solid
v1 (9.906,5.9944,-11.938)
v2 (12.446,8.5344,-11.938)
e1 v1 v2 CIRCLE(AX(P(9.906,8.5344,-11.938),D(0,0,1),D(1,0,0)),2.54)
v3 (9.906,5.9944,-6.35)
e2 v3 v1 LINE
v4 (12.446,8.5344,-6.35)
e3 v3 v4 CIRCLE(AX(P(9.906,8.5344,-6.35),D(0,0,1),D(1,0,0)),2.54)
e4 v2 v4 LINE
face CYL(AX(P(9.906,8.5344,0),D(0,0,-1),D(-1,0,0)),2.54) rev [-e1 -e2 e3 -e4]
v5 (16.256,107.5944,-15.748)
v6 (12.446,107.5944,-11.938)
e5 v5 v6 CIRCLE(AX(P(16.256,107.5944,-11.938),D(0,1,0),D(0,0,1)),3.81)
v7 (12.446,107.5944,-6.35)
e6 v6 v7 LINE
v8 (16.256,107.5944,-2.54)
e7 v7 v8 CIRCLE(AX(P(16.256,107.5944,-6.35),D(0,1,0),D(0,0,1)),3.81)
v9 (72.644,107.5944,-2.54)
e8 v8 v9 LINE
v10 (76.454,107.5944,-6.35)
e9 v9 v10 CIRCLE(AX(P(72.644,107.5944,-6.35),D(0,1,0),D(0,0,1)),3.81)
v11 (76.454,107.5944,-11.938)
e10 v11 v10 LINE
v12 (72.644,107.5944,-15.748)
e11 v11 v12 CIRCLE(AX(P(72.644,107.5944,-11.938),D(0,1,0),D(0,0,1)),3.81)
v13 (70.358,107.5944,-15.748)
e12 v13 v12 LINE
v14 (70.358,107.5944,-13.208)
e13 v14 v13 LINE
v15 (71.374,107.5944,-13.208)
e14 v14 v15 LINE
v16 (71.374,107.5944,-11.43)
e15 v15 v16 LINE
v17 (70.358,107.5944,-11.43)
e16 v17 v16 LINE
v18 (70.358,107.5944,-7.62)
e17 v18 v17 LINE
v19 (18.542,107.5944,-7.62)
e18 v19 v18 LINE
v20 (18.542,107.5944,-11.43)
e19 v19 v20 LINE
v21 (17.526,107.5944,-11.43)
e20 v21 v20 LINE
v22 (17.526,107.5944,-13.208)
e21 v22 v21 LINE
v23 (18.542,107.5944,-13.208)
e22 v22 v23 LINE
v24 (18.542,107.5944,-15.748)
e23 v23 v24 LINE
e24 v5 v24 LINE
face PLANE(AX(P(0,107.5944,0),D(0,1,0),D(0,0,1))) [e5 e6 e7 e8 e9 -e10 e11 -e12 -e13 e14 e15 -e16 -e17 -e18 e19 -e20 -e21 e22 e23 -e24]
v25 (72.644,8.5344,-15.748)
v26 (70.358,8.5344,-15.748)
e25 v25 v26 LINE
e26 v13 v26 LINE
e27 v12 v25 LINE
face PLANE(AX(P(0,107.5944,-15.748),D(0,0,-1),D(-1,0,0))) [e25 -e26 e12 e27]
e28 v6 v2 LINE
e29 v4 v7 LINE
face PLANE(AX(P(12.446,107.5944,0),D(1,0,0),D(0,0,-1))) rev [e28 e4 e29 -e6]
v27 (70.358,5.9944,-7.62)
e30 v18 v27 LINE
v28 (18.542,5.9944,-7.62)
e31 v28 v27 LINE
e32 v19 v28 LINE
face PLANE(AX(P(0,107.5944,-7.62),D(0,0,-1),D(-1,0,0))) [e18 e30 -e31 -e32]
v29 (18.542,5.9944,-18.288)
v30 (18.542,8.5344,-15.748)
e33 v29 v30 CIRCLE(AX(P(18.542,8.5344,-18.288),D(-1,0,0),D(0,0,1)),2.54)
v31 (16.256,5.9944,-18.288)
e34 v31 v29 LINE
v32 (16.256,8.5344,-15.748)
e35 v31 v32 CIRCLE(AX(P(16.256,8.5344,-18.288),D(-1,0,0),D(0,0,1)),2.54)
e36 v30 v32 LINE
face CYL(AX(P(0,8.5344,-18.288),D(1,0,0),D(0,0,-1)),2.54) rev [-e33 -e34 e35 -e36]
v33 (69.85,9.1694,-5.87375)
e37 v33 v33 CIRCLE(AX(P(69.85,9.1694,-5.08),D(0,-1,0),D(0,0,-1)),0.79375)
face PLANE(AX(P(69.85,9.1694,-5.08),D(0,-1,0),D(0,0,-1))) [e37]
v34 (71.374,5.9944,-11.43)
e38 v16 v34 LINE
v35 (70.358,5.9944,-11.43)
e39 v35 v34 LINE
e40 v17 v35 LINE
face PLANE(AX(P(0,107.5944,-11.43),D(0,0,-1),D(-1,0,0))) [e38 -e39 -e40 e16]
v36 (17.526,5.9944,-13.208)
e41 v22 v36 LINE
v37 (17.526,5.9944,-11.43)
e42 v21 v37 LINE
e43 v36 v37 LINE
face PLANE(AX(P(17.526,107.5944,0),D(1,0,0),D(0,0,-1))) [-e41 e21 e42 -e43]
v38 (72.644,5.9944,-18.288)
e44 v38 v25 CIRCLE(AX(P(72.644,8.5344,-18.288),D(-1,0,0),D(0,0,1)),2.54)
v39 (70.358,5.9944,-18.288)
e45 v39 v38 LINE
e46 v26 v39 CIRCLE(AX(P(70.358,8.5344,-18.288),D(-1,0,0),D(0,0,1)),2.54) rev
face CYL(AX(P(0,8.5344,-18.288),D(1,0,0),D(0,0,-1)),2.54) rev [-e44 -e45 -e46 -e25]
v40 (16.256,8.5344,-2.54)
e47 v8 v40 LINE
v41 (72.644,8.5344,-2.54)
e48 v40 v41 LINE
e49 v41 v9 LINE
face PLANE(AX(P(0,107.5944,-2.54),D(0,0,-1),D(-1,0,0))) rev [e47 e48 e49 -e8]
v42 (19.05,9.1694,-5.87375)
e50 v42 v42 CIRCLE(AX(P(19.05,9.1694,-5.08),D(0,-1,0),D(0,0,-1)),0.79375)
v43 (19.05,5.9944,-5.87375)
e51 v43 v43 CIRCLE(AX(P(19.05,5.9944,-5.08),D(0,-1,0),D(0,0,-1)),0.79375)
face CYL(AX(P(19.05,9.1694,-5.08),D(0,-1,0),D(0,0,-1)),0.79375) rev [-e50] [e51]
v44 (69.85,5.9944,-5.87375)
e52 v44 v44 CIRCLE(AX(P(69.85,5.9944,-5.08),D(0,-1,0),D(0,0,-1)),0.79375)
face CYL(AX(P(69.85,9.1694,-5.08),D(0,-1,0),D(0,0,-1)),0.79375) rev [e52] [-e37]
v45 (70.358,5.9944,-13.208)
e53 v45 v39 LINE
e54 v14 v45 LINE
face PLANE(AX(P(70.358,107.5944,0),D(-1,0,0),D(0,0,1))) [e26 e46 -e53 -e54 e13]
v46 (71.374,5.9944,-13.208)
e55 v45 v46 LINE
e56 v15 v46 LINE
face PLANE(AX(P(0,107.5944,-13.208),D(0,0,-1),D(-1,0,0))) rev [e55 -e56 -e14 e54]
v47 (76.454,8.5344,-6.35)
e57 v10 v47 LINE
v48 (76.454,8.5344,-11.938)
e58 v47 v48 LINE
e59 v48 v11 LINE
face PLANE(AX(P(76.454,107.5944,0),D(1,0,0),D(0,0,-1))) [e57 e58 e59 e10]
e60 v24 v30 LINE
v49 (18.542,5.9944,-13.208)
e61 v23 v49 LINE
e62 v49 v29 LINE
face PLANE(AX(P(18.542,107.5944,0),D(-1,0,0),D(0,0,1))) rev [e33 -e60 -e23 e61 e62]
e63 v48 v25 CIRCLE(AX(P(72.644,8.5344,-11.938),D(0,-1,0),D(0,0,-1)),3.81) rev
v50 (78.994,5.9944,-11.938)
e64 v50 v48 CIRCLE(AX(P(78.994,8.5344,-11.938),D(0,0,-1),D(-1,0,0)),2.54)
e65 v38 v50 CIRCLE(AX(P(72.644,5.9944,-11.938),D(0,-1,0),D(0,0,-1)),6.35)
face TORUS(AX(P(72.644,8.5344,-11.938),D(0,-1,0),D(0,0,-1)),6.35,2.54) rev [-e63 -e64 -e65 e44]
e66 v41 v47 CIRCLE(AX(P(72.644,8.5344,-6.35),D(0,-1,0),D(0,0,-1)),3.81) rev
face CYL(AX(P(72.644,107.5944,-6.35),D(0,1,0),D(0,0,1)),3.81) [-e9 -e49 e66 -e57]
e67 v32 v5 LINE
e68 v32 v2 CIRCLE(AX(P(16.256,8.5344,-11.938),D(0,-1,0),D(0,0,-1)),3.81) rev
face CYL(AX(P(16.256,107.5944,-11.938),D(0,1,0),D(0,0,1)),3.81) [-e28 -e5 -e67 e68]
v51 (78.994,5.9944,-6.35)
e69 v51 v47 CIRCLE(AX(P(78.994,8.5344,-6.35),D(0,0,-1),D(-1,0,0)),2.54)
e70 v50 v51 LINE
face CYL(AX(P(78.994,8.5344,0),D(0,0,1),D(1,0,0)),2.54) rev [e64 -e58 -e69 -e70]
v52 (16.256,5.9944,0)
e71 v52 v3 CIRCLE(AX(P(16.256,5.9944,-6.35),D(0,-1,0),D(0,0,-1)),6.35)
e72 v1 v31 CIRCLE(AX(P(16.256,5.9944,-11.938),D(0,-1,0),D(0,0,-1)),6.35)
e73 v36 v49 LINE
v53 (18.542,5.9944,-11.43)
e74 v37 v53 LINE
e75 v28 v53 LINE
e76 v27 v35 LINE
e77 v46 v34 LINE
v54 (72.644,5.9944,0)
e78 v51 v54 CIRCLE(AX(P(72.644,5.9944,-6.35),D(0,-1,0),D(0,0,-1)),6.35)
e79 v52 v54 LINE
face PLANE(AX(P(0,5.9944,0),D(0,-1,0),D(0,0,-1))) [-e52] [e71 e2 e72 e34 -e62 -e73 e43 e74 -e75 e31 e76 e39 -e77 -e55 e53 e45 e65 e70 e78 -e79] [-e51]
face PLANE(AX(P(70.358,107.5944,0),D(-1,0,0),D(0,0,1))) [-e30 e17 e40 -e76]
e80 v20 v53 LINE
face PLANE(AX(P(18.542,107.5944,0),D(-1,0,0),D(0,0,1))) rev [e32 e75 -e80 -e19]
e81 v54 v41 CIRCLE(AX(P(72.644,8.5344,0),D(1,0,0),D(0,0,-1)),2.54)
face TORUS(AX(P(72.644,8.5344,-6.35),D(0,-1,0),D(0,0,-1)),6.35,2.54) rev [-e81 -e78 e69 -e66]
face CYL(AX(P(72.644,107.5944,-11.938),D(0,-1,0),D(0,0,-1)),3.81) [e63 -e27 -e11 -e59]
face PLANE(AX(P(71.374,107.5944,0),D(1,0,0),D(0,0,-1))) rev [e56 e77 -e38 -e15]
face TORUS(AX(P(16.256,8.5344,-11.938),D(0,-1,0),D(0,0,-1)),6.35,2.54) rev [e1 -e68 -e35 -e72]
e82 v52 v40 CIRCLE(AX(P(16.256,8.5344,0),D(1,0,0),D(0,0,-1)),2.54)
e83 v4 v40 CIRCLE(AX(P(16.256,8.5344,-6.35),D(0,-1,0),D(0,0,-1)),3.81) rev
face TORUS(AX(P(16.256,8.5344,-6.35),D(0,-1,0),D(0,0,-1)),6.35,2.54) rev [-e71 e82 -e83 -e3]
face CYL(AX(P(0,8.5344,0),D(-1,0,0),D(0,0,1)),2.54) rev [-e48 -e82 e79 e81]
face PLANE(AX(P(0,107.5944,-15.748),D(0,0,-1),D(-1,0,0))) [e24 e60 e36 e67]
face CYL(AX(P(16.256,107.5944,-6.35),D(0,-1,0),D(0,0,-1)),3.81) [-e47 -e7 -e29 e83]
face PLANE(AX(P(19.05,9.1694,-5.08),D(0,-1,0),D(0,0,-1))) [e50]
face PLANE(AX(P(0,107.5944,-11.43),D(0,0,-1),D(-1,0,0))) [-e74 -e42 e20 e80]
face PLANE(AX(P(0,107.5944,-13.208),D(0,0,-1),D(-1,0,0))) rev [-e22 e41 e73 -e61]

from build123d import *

# Parameters (mm, degrees)
SKETCH2_W               = 88.9
SKETCH2_H               = 152.4
BOSS_EXTRUDE1_DEPTH     = 5.9944
CUT_EXTRUDE2_DEPTH      = 177.535840076
CUT_EXTRUDE2_DEPTH_BACK = 177.535840076
SKETCH4_R               = 2.7305
BOSS_EXTRUDE2_DEPTH     = 101.6
FILLET1_R               = 3.81
FILLET2_R               = 2.54
BOSS_EXTRUDE3_DEPTH     = 20.32
FILLET3_R               = 3.81
FILLET6_R               = 3.81
FILLET7_R               = 2.54
CUT_EXTRUDE3_DEPTH      = 204.596488182
CUT_EXTRUDE3_DEPTH_BACK = 204.596488182
SKETCH7_W               = 2.54
SKETCH7_H               = 152.4
SKETCH8_W               = 86.36
SKETCH8_H               = 152.4
CUT_EXTRUDE5_DEPTH      = 5.9944
SKETCH9_R               = 0.79375
CUT_EXTRUDE6_DEPTH      = 3.175


with BuildPart() as part:
    # Sketch2 → Boss-Extrude1 (new body)
    with BuildSketch(Plane(origin=(0, 0, 0), x_dir=(1, 0, 0), z_dir=(0, 1, 0))):
        with Locations((44.45, 76.2)):
            Rectangle(SKETCH2_W, SKETCH2_H)
    extrude(amount=BOSS_EXTRUDE1_DEPTH)

    # Sketch4 → Cut-Extrude2 (cut, two sides: drawn at the far end of the back side and taken through both)
    with BuildSketch(Plane(origin=(0, 5.9944, 0), x_dir=(1, 0, 0), z_dir=(0, 1, 0)).offset(-CUT_EXTRUDE2_DEPTH_BACK)):
        with Locations(Location((45.72, 109.871331367, 0), (0, 0, 270))):
            Circle(SKETCH4_R)
        with Locations(Location((45.72, 33.671331367, 0), (0, 0, 270))):
            Circle(SKETCH4_R)
    extrude(amount=CUT_EXTRUDE2_DEPTH + CUT_EXTRUDE2_DEPTH_BACK, mode=Mode.SUBTRACT)

    # Sketch5 → Boss-Extrude2 (add)
    with BuildSketch(Plane(origin=(0, 5.9944, 0), x_dir=(1, 0, 0), z_dir=(0, 1, 0))):
        Polygon((18.542, 15.748), (12.446, 15.748), (12.446, 2.54), (76.454, 2.54), (76.454, 15.748), (70.358, 15.748), (70.358, 13.208), (71.374, 13.208), (71.374, 11.43), (70.358, 11.43), (70.358, 7.62), (18.542, 7.62), (18.542, 11.43), (17.526, 11.43), (17.526, 13.208), (18.542, 13.208), align=None)
    extrude(amount=BOSS_EXTRUDE2_DEPTH)

    # Fillet1
    fillet1_edges = [part.edges().sort_by_distance(p)[0] for p in [
        (12.446, 56.7944, -15.748),
        (12.446, 56.7944, -2.54),
        (76.454, 56.7944, -2.54),
        (76.454, 56.7944, -15.748),
    ]]
    fillet(fillet1_edges, radius=FILLET1_R)

    # Fillet2
    fillet2_edges = [part.edges().sort_by_distance(p)[0] for p in [
        (71.501, 5.9944, -15.748),
        (44.45, 5.9944, -2.54),
        (12.446, 5.9944, -9.144),
        (17.399, 5.9944, -15.748),
        (76.454, 5.9944, -9.144),
        (13.561923164, 5.9944, -3.655923164),
        (13.561923164, 5.9944, -14.632076836),
        (75.338076836, 5.9944, -3.655923164),
        (75.338076836, 5.9944, -14.632076836),
    ]]
    fillet(fillet2_edges, radius=FILLET2_R - 0.0001)  # a hair under: the kernel refuses the full size

    # Sketch6 → Boss-Extrude3 (add, symmetric)
    with BuildSketch(Plane.ZY.offset(-44.45)):
        Polygon((-149.86, 5.9944), (-79.121, 5.9944), (-79.121, 23.1394), (-86.106, 23.1394), (-86.106, 18.0594), (-84.201, 18.0594), (-84.201, 16.1544), (-86.106, 16.1544), (-86.106, 11.0744), (-142.875, 11.0744), (-142.875, 16.1544), (-144.78, 16.1544), (-144.78, 18.0594), (-142.875, 18.0594), (-142.875, 23.1394), (-149.86, 23.1394), align=None)
    extrude(amount=BOSS_EXTRUDE3_DEPTH, both=True)

    # Fillet3
    fillet3_edges = [part.edges().sort_by_distance(p)[0] for p in [
        (44.45, 23.1394, -149.86),
        (44.45, 23.1394, -79.121),
    ]]
    fillet(fillet3_edges, radius=FILLET3_R)

    # Fillet6
    fillet6_edges = [part.edges().sort_by_distance(p)[0] for p in [
        (24.13, 12.6619, -149.86),
        (64.77, 12.6619, -79.121),
        (24.13, 23.1394, -84.5185),
        (24.13, 12.6619, -79.121),
        (64.77, 23.1394, -84.5185),
        (64.77, 12.6619, -149.86),
        (64.77, 23.1394, -144.4625),
        (64.77, 22.023476836, -148.744076836),
        (64.77, 22.023476836, -80.236923164),
        (24.13, 23.1394, -144.4625),
        (24.13, 22.023476836, -148.744076836),
        (24.13, 22.023476836, -80.236923164),
    ]]
    fillet(fillet6_edges, radius=FILLET6_R)

    # Fillet7
    fillet7_edges = [part.edges().sort_by_distance(p)[0] for p in [
        (24.13, 5.9944, -114.4905),
        (64.77, 5.9944, -114.4905),
        (44.45, 5.9944, -79.121),
        (44.45, 5.9944, -149.86),
        (25.245923164, 5.9944, -80.236923164),
        (63.654076836, 5.9944, -80.236923164),
        (63.654076836, 5.9944, -148.744076836),
        (25.245923164, 5.9944, -148.744076836),
    ]]
    fillet(fillet7_edges, radius=FILLET7_R - 0.0001)  # a hair under: the kernel refuses the full size

    # Sketch7 → Cut-Extrude3 (cut, two sides: drawn at the far end of the back side and taken through both)
    with BuildSketch(Plane(origin=(0, 5.9944, 0), x_dir=(1, 0, 0), z_dir=(0, 1, 0)).offset(-CUT_EXTRUDE3_DEPTH_BACK)):
        with Locations((1.27, 76.2)):
            Rectangle(SKETCH7_W, SKETCH7_H)
    extrude(amount=CUT_EXTRUDE3_DEPTH + CUT_EXTRUDE3_DEPTH_BACK, mode=Mode.SUBTRACT)

    # Sketch8 → Cut-Extrude5 (cut)
    with BuildSketch(Plane.XZ):
        with Locations((45.72, -76.2)):
            Rectangle(SKETCH8_W, SKETCH8_H)
    extrude(amount=-CUT_EXTRUDE5_DEPTH, mode=Mode.SUBTRACT)


with BuildPart() as body_2:
    # of the pieces the cut leaves, the one that is kept (cut_extrude5_keep)
    add(part.part.solids().sort_by_distance((18.542, 8.5343, -15.748))[0])

    # Sketch9 → Cut-Extrude6 (cut)
    with BuildSketch(Plane.XZ.offset(-5.9944)):
        with Locations(Location((69.85, -5.08, 0), (0, 0, 270))):
            Circle(SKETCH9_R)
        with Locations(Location((19.05, -5.08, 0), (0, 0, 270))):
            Circle(SKETCH9_R)
    extrude(amount=-CUT_EXTRUDE6_DEPTH, mode=Mode.SUBTRACT)


solid = body_2.part
